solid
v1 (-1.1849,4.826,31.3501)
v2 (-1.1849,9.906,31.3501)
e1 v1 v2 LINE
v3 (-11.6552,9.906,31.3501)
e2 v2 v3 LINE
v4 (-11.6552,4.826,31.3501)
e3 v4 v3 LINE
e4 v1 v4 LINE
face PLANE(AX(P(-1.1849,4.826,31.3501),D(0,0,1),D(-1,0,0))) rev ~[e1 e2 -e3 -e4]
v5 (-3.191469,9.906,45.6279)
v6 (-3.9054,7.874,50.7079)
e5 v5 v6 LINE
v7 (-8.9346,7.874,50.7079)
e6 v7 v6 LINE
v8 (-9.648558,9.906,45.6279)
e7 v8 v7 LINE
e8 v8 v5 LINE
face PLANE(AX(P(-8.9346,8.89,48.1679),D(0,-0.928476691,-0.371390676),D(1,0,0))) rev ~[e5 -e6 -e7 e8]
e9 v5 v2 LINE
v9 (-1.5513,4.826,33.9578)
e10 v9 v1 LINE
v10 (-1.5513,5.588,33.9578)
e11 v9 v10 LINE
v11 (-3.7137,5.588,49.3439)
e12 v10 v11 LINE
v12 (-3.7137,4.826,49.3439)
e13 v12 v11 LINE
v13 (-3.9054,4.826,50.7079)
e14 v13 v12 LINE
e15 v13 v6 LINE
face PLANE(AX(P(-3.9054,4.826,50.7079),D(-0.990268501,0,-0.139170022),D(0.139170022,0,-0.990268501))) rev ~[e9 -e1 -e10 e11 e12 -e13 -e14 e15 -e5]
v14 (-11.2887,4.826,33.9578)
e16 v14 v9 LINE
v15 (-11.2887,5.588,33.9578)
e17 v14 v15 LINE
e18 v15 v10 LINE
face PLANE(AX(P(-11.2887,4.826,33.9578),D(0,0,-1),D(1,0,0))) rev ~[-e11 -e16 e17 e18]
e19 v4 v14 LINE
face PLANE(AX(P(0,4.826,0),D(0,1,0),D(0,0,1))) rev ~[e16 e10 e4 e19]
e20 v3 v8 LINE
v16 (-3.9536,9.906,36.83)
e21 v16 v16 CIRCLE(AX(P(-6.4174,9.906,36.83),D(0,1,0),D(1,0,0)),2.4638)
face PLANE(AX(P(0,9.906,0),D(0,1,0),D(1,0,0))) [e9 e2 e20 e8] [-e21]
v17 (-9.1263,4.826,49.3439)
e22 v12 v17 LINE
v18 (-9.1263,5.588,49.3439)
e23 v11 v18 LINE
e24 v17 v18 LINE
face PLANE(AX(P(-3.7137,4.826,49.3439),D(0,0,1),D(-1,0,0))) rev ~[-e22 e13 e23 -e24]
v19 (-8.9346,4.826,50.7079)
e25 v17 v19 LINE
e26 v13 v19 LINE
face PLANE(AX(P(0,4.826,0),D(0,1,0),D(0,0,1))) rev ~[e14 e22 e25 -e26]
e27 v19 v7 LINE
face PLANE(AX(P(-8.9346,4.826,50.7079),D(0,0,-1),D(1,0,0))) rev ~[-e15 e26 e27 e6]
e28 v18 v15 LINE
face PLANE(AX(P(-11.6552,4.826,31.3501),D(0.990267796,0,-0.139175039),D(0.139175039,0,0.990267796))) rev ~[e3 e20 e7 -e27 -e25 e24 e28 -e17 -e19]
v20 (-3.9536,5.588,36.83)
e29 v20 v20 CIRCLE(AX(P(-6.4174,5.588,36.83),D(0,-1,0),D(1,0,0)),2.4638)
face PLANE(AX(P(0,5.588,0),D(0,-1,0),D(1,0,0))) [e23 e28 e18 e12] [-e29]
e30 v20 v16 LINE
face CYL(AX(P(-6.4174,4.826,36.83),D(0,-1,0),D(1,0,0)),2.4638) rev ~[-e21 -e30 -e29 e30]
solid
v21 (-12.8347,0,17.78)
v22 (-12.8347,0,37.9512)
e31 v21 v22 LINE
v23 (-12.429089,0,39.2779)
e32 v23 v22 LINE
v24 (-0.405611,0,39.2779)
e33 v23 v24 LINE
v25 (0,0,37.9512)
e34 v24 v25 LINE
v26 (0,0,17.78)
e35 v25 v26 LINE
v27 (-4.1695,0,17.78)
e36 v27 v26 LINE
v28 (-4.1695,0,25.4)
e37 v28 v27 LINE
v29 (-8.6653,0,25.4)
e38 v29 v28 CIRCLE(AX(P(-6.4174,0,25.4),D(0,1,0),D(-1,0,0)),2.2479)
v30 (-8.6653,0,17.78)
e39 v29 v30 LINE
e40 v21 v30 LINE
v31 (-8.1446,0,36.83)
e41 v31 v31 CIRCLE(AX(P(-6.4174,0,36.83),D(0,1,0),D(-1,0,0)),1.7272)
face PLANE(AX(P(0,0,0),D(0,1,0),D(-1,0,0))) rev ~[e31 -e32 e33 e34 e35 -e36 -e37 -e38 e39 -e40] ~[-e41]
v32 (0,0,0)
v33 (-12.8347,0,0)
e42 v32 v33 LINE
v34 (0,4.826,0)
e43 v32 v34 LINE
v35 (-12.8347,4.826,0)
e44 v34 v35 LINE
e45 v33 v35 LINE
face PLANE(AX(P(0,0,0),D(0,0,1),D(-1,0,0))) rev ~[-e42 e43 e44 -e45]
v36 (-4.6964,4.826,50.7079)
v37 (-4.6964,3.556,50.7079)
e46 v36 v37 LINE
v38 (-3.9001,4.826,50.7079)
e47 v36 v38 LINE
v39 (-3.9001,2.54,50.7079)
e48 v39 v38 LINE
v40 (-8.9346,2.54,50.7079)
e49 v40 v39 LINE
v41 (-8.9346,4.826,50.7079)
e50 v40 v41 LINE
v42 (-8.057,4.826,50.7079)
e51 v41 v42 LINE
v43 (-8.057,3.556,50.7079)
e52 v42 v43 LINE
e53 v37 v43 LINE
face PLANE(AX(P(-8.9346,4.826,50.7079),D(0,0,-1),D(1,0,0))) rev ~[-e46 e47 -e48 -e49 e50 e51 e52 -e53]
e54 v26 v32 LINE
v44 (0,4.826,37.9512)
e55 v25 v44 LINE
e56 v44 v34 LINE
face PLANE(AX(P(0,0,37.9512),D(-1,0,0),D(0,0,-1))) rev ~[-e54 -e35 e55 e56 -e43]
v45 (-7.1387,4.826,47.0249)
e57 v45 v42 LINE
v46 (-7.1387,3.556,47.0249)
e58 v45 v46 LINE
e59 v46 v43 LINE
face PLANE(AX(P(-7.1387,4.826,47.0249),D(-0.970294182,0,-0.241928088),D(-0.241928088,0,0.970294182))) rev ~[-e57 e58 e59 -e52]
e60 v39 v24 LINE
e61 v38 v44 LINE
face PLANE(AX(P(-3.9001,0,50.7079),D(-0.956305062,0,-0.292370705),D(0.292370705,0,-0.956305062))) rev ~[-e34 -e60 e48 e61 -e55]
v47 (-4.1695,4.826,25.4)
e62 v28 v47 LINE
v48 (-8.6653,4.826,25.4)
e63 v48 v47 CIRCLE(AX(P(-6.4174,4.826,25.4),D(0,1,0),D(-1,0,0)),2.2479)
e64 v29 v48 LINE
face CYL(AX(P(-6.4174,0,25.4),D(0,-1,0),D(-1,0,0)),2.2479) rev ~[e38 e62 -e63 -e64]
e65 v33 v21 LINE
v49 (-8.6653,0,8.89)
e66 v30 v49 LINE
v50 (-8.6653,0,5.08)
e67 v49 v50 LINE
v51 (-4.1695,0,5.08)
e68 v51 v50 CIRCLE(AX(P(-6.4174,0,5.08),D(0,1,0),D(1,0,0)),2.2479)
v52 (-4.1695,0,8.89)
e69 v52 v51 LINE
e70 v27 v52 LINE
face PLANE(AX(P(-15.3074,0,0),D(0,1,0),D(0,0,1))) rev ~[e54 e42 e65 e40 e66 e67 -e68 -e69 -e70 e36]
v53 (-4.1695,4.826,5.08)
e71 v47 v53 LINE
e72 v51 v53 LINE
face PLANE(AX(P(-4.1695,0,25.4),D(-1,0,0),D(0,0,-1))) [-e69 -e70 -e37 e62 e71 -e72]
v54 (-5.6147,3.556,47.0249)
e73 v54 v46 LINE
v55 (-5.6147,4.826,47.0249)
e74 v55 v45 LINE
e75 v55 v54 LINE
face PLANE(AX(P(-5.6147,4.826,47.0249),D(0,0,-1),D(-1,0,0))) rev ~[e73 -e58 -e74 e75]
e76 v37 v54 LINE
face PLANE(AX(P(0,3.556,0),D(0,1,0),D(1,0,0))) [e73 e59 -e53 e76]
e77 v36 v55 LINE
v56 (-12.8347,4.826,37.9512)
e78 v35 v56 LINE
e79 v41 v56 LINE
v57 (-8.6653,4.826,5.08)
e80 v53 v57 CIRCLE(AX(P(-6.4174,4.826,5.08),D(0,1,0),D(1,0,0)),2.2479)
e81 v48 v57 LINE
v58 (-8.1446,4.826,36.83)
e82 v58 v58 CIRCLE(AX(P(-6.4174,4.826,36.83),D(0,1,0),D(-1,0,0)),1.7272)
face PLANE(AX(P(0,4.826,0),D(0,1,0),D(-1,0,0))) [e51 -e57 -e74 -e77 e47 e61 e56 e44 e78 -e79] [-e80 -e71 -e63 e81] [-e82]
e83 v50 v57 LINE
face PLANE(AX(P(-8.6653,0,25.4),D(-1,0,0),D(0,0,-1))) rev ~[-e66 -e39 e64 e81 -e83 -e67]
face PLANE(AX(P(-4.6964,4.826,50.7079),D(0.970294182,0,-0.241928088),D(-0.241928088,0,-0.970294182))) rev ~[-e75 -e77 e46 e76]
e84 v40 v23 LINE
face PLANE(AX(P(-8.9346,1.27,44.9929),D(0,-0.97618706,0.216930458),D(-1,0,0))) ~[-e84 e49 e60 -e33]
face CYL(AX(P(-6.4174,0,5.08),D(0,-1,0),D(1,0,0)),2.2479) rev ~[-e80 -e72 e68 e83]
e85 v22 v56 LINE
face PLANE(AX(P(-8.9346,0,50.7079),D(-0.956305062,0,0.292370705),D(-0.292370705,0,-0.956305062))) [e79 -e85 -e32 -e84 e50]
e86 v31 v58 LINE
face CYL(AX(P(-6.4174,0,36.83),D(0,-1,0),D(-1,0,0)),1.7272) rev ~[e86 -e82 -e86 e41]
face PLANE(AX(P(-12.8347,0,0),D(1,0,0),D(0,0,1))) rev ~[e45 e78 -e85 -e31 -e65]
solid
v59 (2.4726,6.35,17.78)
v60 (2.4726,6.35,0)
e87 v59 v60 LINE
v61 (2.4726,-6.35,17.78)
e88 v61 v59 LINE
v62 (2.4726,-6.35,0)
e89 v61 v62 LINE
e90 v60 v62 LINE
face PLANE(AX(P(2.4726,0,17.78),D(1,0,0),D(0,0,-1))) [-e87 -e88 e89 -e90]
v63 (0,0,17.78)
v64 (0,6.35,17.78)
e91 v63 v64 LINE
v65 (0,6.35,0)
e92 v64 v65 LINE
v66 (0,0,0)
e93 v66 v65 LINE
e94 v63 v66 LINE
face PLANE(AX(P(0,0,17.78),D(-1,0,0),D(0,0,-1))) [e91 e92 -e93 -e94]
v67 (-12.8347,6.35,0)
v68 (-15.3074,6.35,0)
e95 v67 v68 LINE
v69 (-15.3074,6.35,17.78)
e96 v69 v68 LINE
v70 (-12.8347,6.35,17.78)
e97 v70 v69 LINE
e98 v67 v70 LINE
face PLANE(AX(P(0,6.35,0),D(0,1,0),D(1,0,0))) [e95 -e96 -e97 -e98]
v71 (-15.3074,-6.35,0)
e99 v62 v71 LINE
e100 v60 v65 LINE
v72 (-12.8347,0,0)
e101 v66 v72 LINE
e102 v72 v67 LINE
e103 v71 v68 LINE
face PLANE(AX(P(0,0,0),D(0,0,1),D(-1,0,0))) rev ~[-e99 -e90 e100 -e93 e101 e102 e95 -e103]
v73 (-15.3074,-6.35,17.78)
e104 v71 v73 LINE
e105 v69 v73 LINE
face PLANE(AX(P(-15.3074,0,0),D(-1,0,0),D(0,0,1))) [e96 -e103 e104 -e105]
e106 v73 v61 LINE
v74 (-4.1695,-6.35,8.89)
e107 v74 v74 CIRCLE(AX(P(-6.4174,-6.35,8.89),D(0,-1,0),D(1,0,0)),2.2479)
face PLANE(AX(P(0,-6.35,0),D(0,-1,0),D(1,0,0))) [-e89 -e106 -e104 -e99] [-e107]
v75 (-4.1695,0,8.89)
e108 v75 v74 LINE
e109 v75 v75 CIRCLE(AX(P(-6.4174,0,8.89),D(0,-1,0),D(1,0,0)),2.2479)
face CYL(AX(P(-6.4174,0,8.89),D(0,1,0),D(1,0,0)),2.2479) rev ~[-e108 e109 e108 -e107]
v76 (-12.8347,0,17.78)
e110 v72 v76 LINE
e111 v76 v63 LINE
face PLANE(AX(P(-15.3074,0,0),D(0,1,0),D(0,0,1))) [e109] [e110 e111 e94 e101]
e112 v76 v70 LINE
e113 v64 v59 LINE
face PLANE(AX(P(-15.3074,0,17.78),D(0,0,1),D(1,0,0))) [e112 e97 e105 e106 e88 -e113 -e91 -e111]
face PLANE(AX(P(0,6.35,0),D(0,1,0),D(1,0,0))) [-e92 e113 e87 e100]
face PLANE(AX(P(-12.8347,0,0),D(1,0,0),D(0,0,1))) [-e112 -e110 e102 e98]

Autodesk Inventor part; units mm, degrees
ref_plane "YZ Plane" through (0, 0, 0) normal (1, 0, 0) x (0, 1, 0)
sketch "Sketch1" plane through (0, 0, 0) normal (0, 1, 0) x (-1, 0, 0)
  line L0 (0, 0) -> (12.8347, 0)
  line L1 (12.8347, 0) -> (12.8347, 37.9512)
  line L2 (8.9346, 50.7079) -> (3.9001, 50.7079)
  line L3 (0, 37.9512) -> (0, 0)
  line L4 (8.9346, 50.7079) -> (12.8347, 37.9512)
  line L5 (3.9001, 50.7079) -> (0, 37.9512)
  line L6 (8.4266, 50.7079) -> (8.9346, 50.7079) construction
  circle A0 centre (6.4174, 36.83) radius 1.7272
  arc A1 (4.1695, 5.08) -> (8.6653, 5.08) centre (6.4174, 5.08) ccw
  arc A2 (8.6653, 25.4) -> (4.1695, 25.4) centre (6.4174, 25.4) ccw
  line L7 (8.6653, 25.4) -> (8.6653, 5.08)
  line L8 (4.1695, 25.4) -> (4.1695, 5.08)
  dimension "d10" = 3.4544
  dimension "d12" = 4.4958
  dimension "d13" = 5.08
  dimension "d14" = 4.4958
  dimension "d15" = 25.4
  dimension "d52" = 6.4173
  dimension "d53" = 12.8347
  dimension "d57" = 163
  dimension "d58" = 163
  dimension "d59" = 5.0345
  dimension "d60" = 6.4173
  dimension "d61" = 6.4173
ref_plane "Work Plane2" through (0, 4.826, 0) normal (0, 1, 0) x (1, 0, 0)
extrude "Extrusion3" add sketch "Sketch1" along normal blind 4.826
chamfer "Chamfer2" distance 2.54 distance2 11.43 1 edges at (-6.4174, 0, 50.7079) measured on face at (-7.2564, 1.6087, 50.7079)
sketch "Sketch12" plane through (0, 4.826, 0) normal (0, 1, 0) x (1, 0, 0)
  line L0 (-3.9001, -50.7079) -> (-8.9346, -50.7079) projected
  line L1 (-4.6964, -50.7079) -> (-5.6147, -47.0249)
  line L2 (-5.6147, -47.0249) -> (-7.1387, -47.0249)
  line L3 (-7.1387, -47.0249) -> (-8.057, -50.7079)
  line L4 (-8.9346, -50.7079) -> (-3.9001, -50.7079) projected
  point P0 (0, 0)
  dimension "d67" = 1.524
  dimension "d68" = 104
  dimension "d69" = 104
  dimension "d70" = 3.683
  dimension "d71" = 0.8776
  dimension "d72" = 5.0345
extrude "Extrusion4" cut sketch "Sketch12" against normal blind 1.27
sketch "Sketch13" plane through (0, 4.826, 0) normal (0, 1, 0) x (1, 0, 0)
  line L0 (-12.8347, -37.9512) -> (-8.9346, -50.7079) projected
  line L1 (-8.9346, -50.7079) -> (-3.9054, -50.7079)
  line L2 (-3.9054, -50.7079) -> (-1.1849, -31.3501)
  line L3 (-1.1849, -31.3501) -> (-11.6552, -31.3501)
  line L4 (-11.6552, -31.3501) -> (-8.9346, -50.7079)
  circle A0 centre (-6.4174, -36.83) radius 2.4638
  circle A1 centre (-6.4174, -36.83) radius 1.7272 projected
  line L5 (-3.9001, -50.7079) -> (-8.9346, -50.7079) projected
  point P0 (0, 0)
  dimension "d75" = 4.9276
  dimension "d76" = 5.0292
  dimension "d86" = 98
  dimension "d88" = 98
extrude "Extrusion5" add sketch "Sketch13" along normal blind 5.08 contours L4 L3 L2 L1
split body "Split1" result two bodies by plane through (0, 4.826, 0) normal (0, 1, 0) first body at (-6.5181, 9.406, 46.8972)
chamfer "Chamfer3" distance 5.08 distance2 2.032 1 edges at (-6.42, 9.906, 50.7079) measured on face at (-6.5181, 9.906, 46.8972)
sketch "Sketch14" plane through (0, 4.826, 0) normal (0, -1, 0) x (1, 0, 0)
  line L0 (-3.7137, 49.3439) -> (-9.1263, 49.3439)
  line L1 (-9.1263, 49.3439) -> (-11.2887, 33.9578)
  line L2 (-11.2887, 33.9578) -> (-1.5513, 33.9578)
  line L3 (-1.5513, 33.9578) -> (-3.7137, 49.3439)
  line L4 (-1.1849, 31.3501) -> (-3.9054, 50.7079) projected
  line L5 (-8.9346, 50.7079) -> (-11.6552, 31.3501) projected
  point P0 (0, 0)
extrude "Extrusion6" cut sketch "Sketch14" against normal blind 0.762 bodies 2
sketch "Sketch15" plane through (0, 0, 0) normal (0, -1, 0) x (1, 0, 0)
  line L0 (-15.3074, 17.78) -> (2.4726, 17.78)
  line L1 (2.4726, 17.78) -> (2.4726, 0)
  line L2 (2.4726, 0) -> (-15.3074, 0)
  line L3 (-15.3074, 0) -> (-15.3074, 17.78)
  line L4 (0, 0) -> (-12.8347, 0) projected
  circle A0 centre (-6.4174, 8.89) radius 2.2479
  point P0 (-6.4174, 0)
  dimension "d89" = 17.78
  dimension "d90" = 17.78
  dimension "d91" = 4.4958
  dimension "d92" = 8.89
  dimension "d93" = 8.89
extrude "Extrusion7" add sketch "Sketch15" along normal blind 6.35 bodies 3
sketch "Sketch16" plane through (0, 4.826, 0) normal (0, 0, -1) x (-1, 0, 0)
  line L0 (-2.4726, -4.826) -> (0, -4.826) projected
  line L1 (12.8378, -4.826) -> (0, -4.826)
ref_plane "Work Plane3" through (-15.3074, 0, 0) normal (0, 1, 0) x (1, 0, 0)
split body "Split2" result two bodies by plane through (-15.3074, 0, 0) normal (0, 1, 0) bodies 3 first body at (-11.4449, 4.326, 21.1171)
sketch "Sketch17" plane through (0, 0, 0) normal (0, 1, 0) x (1, 0, 0)
  line L0 (0, -37.9512) -> (0, 0) projected
  line L1 (0, -17.78) -> (2.4726, -17.78)
  line L2 (2.4726, -17.78) -> (2.4726, 0)
  line L3 (2.4726, 0) -> (0, 0)
  line L4 (0, 0) -> (0, -17.78)
  line L5 (2.4726, 0) -> (-15.3074, 0) projected
  line L6 (-12.8347, 0) -> (-12.8347, -37.9512) projected
  line L7 (-15.3074, 0) -> (-12.8347, 0)
  line L8 (-12.8347, 0) -> (-12.8347, -17.78)
  line L9 (-12.8347, -17.78) -> (-15.3074, -17.78)
  line L10 (-15.3074, -17.78) -> (-15.3074, 0)
  line L11 (2.4726, -17.78) -> (2.4726, 0) projected
  line L12 (-15.3074, -17.78) -> (2.4726, -17.78) projected
  point P0 (2.4726, -8.89)
  point P1 (-14.071, -17.78)
extrude "Extrusion8" add sketch "Sketch17" along normal blind 6.35 contours L0 L3 L2 L1 | L9 L10 L5 L6 bodies 5
equation "\"d52\" = 0.5 * d53"
equation "\"d60\" = 0.5 * d53"
equation "\"d61\" = 0.5 * d53"
equation "\"d71\" = -0.25 * d67 + 0.25 * d72"
equation "\"d23\" = 0.5 * d24"
equation "\"d24\" = 12.7"
properties part number "clamp_v2_1inch_slot_v1"
